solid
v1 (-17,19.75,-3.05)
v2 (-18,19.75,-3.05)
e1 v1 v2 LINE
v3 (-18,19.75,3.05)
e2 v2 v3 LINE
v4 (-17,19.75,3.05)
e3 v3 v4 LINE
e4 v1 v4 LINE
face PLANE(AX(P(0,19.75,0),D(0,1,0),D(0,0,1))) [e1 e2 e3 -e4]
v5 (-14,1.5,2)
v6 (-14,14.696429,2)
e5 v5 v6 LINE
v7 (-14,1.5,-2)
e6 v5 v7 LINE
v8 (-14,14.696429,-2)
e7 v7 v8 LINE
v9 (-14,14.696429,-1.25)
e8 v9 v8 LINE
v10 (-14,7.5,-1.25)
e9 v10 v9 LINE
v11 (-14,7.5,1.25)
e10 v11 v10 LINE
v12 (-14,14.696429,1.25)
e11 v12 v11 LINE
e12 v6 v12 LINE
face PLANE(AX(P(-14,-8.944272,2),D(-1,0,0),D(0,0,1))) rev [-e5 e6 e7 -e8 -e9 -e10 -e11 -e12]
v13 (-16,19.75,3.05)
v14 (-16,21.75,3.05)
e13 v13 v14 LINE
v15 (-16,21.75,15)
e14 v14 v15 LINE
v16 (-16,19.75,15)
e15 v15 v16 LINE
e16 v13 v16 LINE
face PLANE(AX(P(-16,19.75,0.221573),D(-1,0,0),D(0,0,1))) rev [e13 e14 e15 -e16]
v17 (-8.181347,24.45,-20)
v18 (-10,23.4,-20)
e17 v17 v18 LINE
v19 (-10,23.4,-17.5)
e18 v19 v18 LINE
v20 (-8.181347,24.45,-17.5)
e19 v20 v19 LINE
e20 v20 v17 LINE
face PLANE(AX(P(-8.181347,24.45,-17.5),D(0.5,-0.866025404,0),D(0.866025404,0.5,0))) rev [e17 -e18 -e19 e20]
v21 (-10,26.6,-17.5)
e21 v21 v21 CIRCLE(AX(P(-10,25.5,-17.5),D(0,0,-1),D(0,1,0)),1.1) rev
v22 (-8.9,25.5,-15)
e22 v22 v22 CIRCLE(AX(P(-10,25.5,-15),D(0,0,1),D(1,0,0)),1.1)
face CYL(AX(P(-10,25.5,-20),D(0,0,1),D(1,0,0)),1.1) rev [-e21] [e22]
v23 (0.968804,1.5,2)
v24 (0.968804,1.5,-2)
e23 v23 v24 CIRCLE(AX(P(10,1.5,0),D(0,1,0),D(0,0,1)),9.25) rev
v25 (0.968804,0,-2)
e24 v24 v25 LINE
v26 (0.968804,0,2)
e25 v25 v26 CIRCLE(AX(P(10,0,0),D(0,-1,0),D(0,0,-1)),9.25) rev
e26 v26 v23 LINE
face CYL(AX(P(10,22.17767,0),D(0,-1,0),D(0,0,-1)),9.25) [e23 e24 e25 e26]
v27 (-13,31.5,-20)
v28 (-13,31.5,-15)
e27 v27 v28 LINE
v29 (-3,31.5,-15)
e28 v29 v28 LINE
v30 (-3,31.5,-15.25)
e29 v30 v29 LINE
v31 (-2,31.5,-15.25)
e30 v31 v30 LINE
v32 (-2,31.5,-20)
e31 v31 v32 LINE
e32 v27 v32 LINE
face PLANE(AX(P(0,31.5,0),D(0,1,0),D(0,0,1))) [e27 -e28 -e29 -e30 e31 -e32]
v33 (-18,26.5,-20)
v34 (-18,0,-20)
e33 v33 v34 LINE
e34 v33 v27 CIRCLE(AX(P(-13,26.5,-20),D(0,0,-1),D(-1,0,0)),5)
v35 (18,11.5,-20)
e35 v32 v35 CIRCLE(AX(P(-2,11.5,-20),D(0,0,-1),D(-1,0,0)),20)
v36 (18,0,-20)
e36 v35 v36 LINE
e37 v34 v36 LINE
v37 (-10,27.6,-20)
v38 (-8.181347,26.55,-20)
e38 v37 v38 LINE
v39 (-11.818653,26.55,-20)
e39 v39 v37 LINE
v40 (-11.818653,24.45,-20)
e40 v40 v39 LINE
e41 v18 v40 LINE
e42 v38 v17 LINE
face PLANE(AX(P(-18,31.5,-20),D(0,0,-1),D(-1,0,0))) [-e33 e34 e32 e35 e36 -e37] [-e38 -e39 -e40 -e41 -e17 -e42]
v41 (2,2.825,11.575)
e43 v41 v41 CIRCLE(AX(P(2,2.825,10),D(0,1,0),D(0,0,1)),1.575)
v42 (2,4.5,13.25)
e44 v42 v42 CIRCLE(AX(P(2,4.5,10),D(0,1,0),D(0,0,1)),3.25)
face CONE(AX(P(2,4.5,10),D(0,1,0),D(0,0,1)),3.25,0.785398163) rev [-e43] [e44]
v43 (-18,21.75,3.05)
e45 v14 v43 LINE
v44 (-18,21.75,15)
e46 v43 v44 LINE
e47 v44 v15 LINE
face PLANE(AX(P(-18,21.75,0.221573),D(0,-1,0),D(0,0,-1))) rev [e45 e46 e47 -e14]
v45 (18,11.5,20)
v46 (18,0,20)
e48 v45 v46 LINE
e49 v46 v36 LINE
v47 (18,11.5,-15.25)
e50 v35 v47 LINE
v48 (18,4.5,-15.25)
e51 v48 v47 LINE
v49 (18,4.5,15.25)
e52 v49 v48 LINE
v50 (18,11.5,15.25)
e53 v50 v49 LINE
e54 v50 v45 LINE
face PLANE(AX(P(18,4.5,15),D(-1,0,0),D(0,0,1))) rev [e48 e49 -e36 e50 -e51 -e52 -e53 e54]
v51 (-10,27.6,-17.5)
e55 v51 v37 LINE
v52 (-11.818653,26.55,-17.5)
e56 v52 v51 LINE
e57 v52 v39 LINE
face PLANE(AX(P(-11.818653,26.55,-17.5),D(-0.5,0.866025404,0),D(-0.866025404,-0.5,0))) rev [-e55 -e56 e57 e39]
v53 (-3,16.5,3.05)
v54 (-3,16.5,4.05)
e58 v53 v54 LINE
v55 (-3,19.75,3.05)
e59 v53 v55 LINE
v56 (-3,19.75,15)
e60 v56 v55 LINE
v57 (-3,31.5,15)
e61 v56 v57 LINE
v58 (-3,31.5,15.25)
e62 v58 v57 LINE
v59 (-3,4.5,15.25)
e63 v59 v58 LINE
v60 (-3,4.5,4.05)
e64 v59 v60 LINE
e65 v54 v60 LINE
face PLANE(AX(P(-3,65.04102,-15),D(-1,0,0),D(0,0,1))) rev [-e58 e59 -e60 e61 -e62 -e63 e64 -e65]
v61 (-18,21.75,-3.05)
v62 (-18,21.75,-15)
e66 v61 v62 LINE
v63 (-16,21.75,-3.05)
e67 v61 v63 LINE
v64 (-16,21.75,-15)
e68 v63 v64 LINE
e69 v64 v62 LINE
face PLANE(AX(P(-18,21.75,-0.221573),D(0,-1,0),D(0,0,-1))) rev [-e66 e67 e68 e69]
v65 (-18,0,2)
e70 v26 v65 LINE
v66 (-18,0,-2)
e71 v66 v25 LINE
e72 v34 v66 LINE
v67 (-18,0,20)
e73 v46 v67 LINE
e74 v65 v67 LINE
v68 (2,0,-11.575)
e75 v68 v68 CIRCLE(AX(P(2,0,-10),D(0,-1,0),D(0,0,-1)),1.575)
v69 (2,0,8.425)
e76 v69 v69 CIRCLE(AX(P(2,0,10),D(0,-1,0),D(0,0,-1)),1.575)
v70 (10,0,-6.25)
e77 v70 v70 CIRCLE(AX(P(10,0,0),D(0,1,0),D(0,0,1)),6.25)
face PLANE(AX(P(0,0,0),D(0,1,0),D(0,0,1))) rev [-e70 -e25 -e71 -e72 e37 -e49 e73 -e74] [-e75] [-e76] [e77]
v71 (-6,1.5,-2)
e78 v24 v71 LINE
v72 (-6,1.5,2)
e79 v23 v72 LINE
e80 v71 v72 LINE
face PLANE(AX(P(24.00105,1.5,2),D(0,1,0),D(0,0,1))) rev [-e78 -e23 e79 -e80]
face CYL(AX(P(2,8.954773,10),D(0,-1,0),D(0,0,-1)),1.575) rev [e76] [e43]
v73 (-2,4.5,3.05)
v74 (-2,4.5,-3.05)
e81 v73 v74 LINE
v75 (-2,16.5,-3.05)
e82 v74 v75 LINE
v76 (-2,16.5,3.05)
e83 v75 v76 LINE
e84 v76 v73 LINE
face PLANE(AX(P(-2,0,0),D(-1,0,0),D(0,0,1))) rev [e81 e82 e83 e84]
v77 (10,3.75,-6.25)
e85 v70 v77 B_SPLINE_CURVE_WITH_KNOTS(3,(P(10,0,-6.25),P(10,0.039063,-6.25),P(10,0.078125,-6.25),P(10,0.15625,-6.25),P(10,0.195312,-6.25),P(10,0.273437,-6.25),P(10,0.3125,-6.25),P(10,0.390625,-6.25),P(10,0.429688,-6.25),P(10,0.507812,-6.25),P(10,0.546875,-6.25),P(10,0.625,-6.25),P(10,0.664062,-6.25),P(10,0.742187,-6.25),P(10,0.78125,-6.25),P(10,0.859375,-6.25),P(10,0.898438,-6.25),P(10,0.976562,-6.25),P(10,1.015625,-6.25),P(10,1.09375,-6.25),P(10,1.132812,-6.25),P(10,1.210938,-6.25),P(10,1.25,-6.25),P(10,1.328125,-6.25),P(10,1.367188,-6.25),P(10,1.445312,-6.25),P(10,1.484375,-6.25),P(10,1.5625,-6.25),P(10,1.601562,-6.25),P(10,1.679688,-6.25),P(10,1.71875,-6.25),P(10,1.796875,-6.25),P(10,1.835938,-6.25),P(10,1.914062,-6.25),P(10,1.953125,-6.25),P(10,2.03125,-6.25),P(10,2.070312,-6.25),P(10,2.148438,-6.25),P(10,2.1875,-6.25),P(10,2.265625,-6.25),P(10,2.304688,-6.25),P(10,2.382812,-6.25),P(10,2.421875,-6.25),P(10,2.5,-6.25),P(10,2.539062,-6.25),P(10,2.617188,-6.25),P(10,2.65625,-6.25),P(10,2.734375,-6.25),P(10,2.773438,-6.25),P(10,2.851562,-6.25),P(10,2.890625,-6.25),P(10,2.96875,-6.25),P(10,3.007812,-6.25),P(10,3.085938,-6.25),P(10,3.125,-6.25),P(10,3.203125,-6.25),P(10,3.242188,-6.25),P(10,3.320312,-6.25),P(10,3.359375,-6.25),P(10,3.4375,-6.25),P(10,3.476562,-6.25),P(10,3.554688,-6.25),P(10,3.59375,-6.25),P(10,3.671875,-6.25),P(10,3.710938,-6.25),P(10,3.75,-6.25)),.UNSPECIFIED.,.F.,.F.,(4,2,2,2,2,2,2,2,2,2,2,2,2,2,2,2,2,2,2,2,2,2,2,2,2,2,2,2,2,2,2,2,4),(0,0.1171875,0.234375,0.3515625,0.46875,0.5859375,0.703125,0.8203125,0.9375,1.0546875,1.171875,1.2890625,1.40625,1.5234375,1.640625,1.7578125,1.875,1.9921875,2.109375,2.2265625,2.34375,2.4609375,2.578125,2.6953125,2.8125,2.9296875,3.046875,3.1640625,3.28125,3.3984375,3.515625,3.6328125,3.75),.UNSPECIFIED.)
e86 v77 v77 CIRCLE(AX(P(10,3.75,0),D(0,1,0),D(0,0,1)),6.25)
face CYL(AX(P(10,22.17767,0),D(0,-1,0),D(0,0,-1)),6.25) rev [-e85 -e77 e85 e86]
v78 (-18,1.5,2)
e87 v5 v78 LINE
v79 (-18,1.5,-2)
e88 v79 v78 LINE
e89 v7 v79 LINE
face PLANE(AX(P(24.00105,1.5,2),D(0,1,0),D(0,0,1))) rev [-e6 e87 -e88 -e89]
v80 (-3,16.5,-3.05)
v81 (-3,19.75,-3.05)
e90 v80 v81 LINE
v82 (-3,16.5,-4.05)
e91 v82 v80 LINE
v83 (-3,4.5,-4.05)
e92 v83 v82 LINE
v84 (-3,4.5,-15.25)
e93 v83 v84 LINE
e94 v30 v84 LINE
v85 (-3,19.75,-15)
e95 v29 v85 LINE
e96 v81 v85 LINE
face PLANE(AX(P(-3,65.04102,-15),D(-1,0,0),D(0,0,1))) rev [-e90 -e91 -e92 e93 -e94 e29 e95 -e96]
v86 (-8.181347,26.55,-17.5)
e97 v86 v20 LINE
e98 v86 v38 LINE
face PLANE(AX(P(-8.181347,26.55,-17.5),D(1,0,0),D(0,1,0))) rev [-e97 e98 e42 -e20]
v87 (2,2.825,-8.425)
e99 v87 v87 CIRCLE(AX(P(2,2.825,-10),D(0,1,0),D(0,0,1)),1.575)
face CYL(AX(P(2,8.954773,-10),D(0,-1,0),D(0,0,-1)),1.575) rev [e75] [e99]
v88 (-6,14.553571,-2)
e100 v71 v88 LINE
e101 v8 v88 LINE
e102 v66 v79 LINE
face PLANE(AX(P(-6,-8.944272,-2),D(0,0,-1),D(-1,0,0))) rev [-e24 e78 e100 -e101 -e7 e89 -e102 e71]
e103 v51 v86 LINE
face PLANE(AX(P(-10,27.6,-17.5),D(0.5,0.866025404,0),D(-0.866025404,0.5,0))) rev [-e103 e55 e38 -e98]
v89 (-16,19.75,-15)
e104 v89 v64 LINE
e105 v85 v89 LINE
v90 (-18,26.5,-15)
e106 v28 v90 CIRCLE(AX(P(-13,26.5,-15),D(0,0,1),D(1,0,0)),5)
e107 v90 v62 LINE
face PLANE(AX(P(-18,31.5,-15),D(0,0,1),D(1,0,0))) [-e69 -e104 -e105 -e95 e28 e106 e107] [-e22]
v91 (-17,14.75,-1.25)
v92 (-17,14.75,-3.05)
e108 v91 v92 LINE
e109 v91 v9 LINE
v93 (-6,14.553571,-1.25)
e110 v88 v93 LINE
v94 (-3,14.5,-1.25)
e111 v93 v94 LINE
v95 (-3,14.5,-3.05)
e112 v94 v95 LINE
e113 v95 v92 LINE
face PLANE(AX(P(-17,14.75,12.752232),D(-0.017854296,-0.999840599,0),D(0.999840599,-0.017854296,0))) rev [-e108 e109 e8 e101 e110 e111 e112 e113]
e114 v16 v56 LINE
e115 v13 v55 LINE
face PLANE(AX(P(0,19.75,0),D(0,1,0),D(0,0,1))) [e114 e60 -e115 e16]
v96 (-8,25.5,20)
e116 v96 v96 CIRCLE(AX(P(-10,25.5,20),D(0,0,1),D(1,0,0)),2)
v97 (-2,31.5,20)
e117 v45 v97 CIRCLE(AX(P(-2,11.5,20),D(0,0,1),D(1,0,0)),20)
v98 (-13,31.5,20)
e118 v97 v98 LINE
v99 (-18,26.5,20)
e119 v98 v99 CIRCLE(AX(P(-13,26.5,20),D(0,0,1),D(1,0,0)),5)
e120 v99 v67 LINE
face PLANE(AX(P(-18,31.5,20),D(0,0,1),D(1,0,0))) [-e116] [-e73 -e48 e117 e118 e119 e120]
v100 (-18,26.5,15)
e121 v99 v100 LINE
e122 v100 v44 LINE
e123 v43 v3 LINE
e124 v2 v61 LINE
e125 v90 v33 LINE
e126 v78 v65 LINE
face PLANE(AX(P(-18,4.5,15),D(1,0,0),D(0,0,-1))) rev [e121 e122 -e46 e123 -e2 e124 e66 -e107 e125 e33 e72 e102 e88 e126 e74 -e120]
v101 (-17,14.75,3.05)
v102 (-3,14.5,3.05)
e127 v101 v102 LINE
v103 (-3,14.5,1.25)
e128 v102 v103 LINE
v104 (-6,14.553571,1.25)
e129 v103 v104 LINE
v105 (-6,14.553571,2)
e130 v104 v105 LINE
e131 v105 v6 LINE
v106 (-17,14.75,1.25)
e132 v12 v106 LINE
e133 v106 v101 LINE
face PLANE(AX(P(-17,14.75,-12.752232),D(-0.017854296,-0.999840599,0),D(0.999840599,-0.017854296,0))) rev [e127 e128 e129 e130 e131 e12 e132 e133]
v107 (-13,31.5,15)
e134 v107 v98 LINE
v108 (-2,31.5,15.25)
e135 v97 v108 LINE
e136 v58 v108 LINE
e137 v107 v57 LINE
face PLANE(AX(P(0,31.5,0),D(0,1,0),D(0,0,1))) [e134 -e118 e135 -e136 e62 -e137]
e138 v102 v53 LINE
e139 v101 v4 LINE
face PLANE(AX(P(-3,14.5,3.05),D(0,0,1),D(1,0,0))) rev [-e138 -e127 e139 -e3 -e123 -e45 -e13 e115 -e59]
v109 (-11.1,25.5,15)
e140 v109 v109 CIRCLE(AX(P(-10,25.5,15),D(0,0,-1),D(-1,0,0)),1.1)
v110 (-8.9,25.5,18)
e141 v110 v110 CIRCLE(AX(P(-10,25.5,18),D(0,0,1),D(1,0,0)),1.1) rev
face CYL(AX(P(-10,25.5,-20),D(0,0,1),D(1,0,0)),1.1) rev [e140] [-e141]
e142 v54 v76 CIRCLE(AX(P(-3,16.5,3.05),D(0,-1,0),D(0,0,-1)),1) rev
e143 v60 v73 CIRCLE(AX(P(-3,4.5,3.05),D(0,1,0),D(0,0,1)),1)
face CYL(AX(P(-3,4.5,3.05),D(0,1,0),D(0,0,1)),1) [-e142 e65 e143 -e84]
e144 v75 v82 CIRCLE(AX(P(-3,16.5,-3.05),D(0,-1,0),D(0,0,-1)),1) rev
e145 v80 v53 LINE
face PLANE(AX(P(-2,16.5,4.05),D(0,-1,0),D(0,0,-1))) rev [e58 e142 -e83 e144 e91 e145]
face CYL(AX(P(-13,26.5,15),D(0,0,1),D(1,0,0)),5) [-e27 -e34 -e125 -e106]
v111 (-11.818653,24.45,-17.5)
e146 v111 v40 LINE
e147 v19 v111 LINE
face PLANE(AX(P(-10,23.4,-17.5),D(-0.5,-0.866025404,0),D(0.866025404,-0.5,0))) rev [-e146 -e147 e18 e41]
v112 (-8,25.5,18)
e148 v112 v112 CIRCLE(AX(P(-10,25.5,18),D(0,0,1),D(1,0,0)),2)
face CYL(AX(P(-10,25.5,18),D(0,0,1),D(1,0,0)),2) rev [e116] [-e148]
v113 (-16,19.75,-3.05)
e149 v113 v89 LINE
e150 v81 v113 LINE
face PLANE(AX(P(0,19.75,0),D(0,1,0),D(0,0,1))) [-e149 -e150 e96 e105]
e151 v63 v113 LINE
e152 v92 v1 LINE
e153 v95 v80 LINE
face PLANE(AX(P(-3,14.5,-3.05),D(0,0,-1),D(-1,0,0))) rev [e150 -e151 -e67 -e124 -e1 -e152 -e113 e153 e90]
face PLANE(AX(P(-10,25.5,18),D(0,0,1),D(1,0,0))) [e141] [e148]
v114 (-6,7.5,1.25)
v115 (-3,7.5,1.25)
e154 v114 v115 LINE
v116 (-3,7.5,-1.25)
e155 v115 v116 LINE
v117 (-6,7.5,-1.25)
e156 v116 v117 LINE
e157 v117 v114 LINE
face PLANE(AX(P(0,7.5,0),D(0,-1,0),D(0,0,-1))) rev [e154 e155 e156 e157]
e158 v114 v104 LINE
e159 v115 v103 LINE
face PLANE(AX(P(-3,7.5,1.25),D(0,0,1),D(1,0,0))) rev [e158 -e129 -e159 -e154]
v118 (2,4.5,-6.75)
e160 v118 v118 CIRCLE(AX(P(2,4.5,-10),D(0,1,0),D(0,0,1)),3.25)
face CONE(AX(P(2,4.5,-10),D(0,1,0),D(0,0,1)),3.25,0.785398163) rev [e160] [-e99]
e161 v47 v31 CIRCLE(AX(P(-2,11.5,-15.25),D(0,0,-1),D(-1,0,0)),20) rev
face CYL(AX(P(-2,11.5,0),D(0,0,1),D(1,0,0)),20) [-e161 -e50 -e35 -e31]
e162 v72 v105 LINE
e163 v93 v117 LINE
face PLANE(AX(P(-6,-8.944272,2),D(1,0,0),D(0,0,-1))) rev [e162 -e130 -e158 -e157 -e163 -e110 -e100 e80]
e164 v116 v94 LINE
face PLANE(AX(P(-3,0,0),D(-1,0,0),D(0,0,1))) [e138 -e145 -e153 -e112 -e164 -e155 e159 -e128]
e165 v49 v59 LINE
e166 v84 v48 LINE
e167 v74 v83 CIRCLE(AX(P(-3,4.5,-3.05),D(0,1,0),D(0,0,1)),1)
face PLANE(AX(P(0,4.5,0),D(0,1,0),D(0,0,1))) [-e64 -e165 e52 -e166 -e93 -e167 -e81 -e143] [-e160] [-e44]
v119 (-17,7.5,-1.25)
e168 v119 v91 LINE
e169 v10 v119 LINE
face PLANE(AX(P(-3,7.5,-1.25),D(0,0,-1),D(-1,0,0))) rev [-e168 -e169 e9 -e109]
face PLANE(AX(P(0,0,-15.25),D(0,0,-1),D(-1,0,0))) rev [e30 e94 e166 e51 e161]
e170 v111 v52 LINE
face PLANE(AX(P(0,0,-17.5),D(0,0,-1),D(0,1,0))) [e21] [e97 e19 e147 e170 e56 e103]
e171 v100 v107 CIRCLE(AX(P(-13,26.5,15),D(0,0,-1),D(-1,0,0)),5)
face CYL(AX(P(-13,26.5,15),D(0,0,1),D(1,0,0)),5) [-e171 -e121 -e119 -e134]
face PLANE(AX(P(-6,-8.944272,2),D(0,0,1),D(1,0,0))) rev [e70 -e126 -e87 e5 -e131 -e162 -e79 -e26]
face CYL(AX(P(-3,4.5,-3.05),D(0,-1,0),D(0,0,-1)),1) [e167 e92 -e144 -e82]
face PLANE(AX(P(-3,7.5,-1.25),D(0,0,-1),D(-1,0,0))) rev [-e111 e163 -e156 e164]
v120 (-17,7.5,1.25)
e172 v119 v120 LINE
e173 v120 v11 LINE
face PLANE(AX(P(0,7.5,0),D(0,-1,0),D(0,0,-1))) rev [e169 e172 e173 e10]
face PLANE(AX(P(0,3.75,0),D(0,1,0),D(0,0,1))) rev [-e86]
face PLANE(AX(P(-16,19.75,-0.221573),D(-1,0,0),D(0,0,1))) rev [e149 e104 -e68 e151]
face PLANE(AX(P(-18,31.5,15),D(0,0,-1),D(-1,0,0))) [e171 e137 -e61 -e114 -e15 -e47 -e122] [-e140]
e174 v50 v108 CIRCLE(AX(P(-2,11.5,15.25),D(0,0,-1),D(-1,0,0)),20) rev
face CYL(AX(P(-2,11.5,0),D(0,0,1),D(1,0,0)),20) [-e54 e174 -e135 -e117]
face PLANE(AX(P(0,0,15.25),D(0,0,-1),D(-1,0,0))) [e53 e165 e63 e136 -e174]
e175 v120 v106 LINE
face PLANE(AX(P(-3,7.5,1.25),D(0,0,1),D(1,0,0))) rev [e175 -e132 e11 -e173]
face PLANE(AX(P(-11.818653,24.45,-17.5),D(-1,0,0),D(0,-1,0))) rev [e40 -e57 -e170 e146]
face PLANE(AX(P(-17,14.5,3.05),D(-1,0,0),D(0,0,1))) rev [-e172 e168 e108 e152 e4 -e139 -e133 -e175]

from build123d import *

# Parameters (mm, degrees)
BASE_W                              = 36
BASE_H                              = 30
BOSS_EXTRUDE1_DEPTH                 = 4.5
WALLS_W                             = 36
WALLS_H                             = 5
WALLS_EXT_DEPTH                     = 31.5
SWITCH_BLOCK_W                      = 15
SWITCH_BLOCK_H                      = 30
SWITCH_BLOCK_EXT_DEPTH              = 15.25
MAGNET_POCKET_R                     = 6.25
MAGNET_POCKET_CUT_DEPTH             = 3.75
FILLET1_R                           = 5
FILLET2_R                           = 5
FILLET3_R                           = 20
FILLET4_R                           = 20
SWITCH_PLACE_W                      = 14
SWITCH_PLACE_H                      = 6.1
SWITCH_POCKET_DEPTH                 = 5.25
SWITCH_CONTACTS_W                   = 14
SWITCH_CONTACTS_H                   = 2.5
SWITCH_LEADS_DEPTH                  = 7
SWITCH_ANGLE_LEFT_DEPTH             = 1.8
SWITCH_ANGLE_RIGHT_DEPTH            = 1.8
SKETCH20_W                          = 8.1
SKETCH20_H                          = 12
BOSS_EXTRUDE5_DEPTH                 = 1
FILLET5_R                           = 1
FILLET6_R                           = 1
WIRE_GUIDE_W                        = 8
WIRE_GUIDE_H                        = 4
WIRE_PASS_THROUGH_DEPTH             = 7.5
WIRE_PASS_THROUGH_DIRECTION_2_REACH = 38.056
WIRE_CHANNEL_OUTLINE_W              = 4
WIRE_CHANNEL_OUTLINE_H              = 4
WIRE_CHANNEL_DEPTH                  = 1.5
ACHSE_R                             = 1.1
M2_ACHSE_DEPTH                      = 55.002314765
M2_NUT_DEPTH                        = 2.5
SKETCH2_R                           = 1.575
M3_MOUNTING_SCREWS_DEPTH            = 4.5
SKETCH9_W                           = 2
SKETCH9_H                           = 2
BOSS_EXTRUDE3_DEPTH                 = 11.95
SKETCH10_W                          = 2
SKETCH10_H                          = 2
BOSS_EXTRUDE4_DEPTH                 = 11.95
SKETCH19_R                          = 2
SCREW_HEAD_DEPTH                    = 2
SKETCH21_W                          = 21
SKETCH21_H                          = 27
CUT_EXTRUDE2_DEPTH                  = 0.25
SKETCH22_W                          = 21
SKETCH22_H                          = 27
CUT_EXTRUDE3_DEPTH                  = 0.25


# Read off the part's stored shape, not the designer's step: Wire Channel
with BuildPart() as part:
    # Base → Boss-Extrude1 (new body)
    with BuildSketch(Plane(origin=(0, 0, 0), x_dir=(1, 0, 0), z_dir=(0, 1, 0))):
        Rectangle(BASE_W, BASE_H)
    extrude(amount=BOSS_EXTRUDE1_DEPTH)

    # Walls → Walls Ext (add)
    with BuildSketch(Plane.XZ):
        with Locations((0, 17.5)):
            Rectangle(WALLS_W, WALLS_H)
        with Locations((0, -17.5)):
            Rectangle(WALLS_W, WALLS_H)
    extrude(amount=-WALLS_EXT_DEPTH)

    # Switch Block → Switch Block Ext (add)
    with BuildSketch(Plane(origin=(0, 4.5, 0), x_dir=(1, 0, 0), z_dir=(0, 1, 0))):
        with Locations((-10.5, 0)):
            Rectangle(SWITCH_BLOCK_W, SWITCH_BLOCK_H)
    extrude(amount=SWITCH_BLOCK_EXT_DEPTH)

    # Magnet Pocket → Magnet Pocket Cut (cut)
    with BuildSketch(Plane(origin=(0, 0, 0), x_dir=(1, 0, 0), z_dir=(0, 1, 0))):
        with Locations(Location((10, 0, 0), (0, 0, 90))):
            Circle(MAGNET_POCKET_R)
    extrude(amount=MAGNET_POCKET_CUT_DEPTH, mode=Mode.SUBTRACT)

    # Fillet1
    fillet1_edges = [part.edges().sort_by_distance(p)[0] for p in [
        (-18, 31.5, -17.5),
    ]]
    fillet(fillet1_edges, radius=FILLET1_R)

    # Fillet2
    fillet2_edges = [part.edges().sort_by_distance(p)[0] for p in [
        (-18, 31.5, 17.5),
    ]]
    fillet(fillet2_edges, radius=FILLET2_R)

    # Fillet3
    fillet3_edges = [part.edges().sort_by_distance(p)[0] for p in [
        (18, 31.5, -17.5),
    ]]
    fillet(fillet3_edges, radius=FILLET3_R)

    # Fillet4
    fillet4_edges = [part.edges().sort_by_distance(p)[0] for p in [
        (18, 31.5, 17.5),
    ]]
    fillet(fillet4_edges, radius=FILLET4_R)

    # Switch Place → Switch Pocket (cut)
    with BuildSketch(Plane(origin=(0, 19.75, 0), x_dir=(1, 0, 0), z_dir=(0, 1, 0))):
        with Locations((-10, 0)):
            Rectangle(SWITCH_PLACE_W, SWITCH_PLACE_H)
    extrude(amount=-SWITCH_POCKET_DEPTH, mode=Mode.SUBTRACT)

    # Switch Contacts → Switch Leads (cut)
    with BuildSketch(Plane(origin=(0, 14.5, 0), x_dir=(1, 0, 0), z_dir=(0, 1, 0))):
        with Locations((-10, 0)):
            Rectangle(SWITCH_CONTACTS_W, SWITCH_CONTACTS_H)
    extrude(amount=-SWITCH_LEADS_DEPTH, mode=Mode.SUBTRACT)

    # Sketch16 → Switch Angle Left (add)
    with BuildSketch(Plane(origin=(0, 0, 3.05), x_dir=(-1, 0, 0), z_dir=(0, 0, -1))):
        Polygon((17, 14.5), (17, 14.75), (3, 14.5), align=None)
    extrude(amount=SWITCH_ANGLE_LEFT_DEPTH)

    # Sketch17 → Switch Angle Right (add)
    with BuildSketch(Plane.XY.offset(-3.05)):
        Polygon((-17, 14.5), (-17, 14.75), (-3, 14.5), align=None)
    extrude(amount=SWITCH_ANGLE_RIGHT_DEPTH)

    # Sketch20 → Boss-Extrude5 (add)
    with BuildSketch(Plane(origin=(-3, 0, 0), x_dir=(0, 0, -1), z_dir=(1, 0, 0))):
        with Locations((0, 10.5)):
            Rectangle(SKETCH20_W, SKETCH20_H)
    extrude(amount=BOSS_EXTRUDE5_DEPTH)

    # Fillet5
    fillet5_edges = [part.edges().sort_by_distance(p)[0] for p in [
        (-2, 10.5, 4.05),
    ]]
    fillet(fillet5_edges, radius=FILLET5_R - 0.0001)  # a hair under: the kernel refuses the full size

    # Fillet6
    fillet6_edges = [part.edges().sort_by_distance(p)[0] for p in [
        (-2, 10.5, -4.05),
    ]]
    fillet(fillet6_edges, radius=FILLET6_R - 0.0001)  # a hair under: the kernel refuses the full size

    # Wire Guide → Wire pass through (cut)
    with BuildSketch(Plane(origin=(0, 7.5, 0), x_dir=(1, 0, 0), z_dir=(0, 1, 0))):
        with Locations((-10, 0)):
            Rectangle(WIRE_GUIDE_W, WIRE_GUIDE_H)
    extrude(amount=-WIRE_PASS_THROUGH_DEPTH, mode=Mode.SUBTRACT)

    # Wire pass through direction 2: up to this plane
    wire_pass_through_direction_2_end = Plane(origin=(-17, 14.75, -12.752231965), z_dir=(-0.017854296416882947, -0.9998405993454447, 0))
    # Wire Guide → Wire pass through direction 2 (cut, up to the surface)
    with BuildSketch(Plane(origin=(0, 7.5, 0), x_dir=(1, 0, 0), z_dir=(0, 1, 0)), mode=Mode.PRIVATE) as wire_pass_through_direction_2_sk1:
        with Locations((-10, 0)):
            Rectangle(WIRE_GUIDE_W, WIRE_GUIDE_H)
    wire_pass_through_direction_2_tool1 = split(extrude(wire_pass_through_direction_2_sk1.sketch, amount=WIRE_PASS_THROUGH_DIRECTION_2_REACH, mode=Mode.PRIVATE), bisect_by=wire_pass_through_direction_2_end, keep=Keep.BOTH, mode=Mode.PRIVATE)
    add(wire_pass_through_direction_2_tool1.solids().sort_by_distance((-10, 7.5, 0))[0], mode=Mode.SUBTRACT)

    # Wire Channel outline → Wire Channel (cut)
    with BuildSketch(Plane(origin=(0, 0, 0), x_dir=(1, 0, 0), z_dir=(0, 1, 0))):
        with Locations((-16, 0)):
            Rectangle(WIRE_CHANNEL_OUTLINE_W, WIRE_CHANNEL_OUTLINE_H)
        with BuildLine():
            Line((-6, 2), (-6, -2))
            Line((-6, -2), (0.968804066, -2))
            ThreePointArc((0.968804066, -2), (0.75, 0), (0.968804066, 2))
            Line((0.968804066, 2), (-6, 2))
        make_face()
    extrude(amount=WIRE_CHANNEL_DEPTH, mode=Mode.SUBTRACT)

    # Achse → M2 Achse (cut, through all)
    with BuildSketch(Plane.XY.offset(20)):
        with Locations((-10, 25.5)):
            Circle(ACHSE_R)
    extrude(amount=-M2_ACHSE_DEPTH, mode=Mode.SUBTRACT)

    # Sketch5 → M2 Nut (cut)
    with BuildSketch(Plane(origin=(0, 0, -20), x_dir=(-1, 0, 0), z_dir=(0, 0, -1))):
        Polygon((10, 27.6), (8.181346652, 26.55), (8.181346652, 24.45), (10, 23.4), (11.818653348, 24.45), (11.818653348, 26.55), align=None)
    extrude(amount=-M2_NUT_DEPTH, mode=Mode.SUBTRACT)

    # Sketch2 → M3 Mounting Screws (cut)
    with BuildSketch(Plane.XZ):
        with Locations(Location((2, -10, 0), (0, 0, 270))):
            Circle(SKETCH2_R)
        with Locations(Location((2, 10, 0), (0, 0, 270))):
            Circle(SKETCH2_R)
    extrude(amount=-M3_MOUNTING_SCREWS_DEPTH, mode=Mode.SUBTRACT)

    # M3 Senkkopf cone 1 section (through the dimple's axis) → M3 Senkkopf (revolve, cut)
    with BuildSketch(Plane(origin=(2, 4.5, 10), x_dir=(0, 0, 1), z_dir=(1, 0, 0))):
        Polygon((0, 0), (3.25, 0), (0, 3.25), align=None)
    revolve(axis=Axis((2, 4.5, 10), (0, -1, 0)), mode=Mode.SUBTRACT)

    # M3 Senkkopf cone 2 section (through the dimple's axis) → M3 Senkkopf cone 2 (revolve, cut)
    with BuildSketch(Plane(origin=(2, 4.5, -10), x_dir=(0, 0, 1), z_dir=(1, 0, 0))):
        Polygon((0, 0), (3.25, 0), (0, 3.25), align=None)
    revolve(axis=Axis((2, 4.5, -10), (0, -1, 0)), mode=Mode.SUBTRACT)

    # Sketch9 → Boss-Extrude3 (add)
    with BuildSketch(Plane.XY.offset(-15)):
        with Locations((-17, 20.75)):
            Rectangle(SKETCH9_W, SKETCH9_H)
    extrude(amount=BOSS_EXTRUDE3_DEPTH)

    # Sketch10 → Boss-Extrude4 (add)
    with BuildSketch(Plane(origin=(0, 0, 15), x_dir=(-1, 0, 0), z_dir=(0, 0, -1))):
        with Locations((17, 20.75)):
            Rectangle(SKETCH10_W, SKETCH10_H)
    extrude(amount=BOSS_EXTRUDE4_DEPTH)

    # Sketch19 → Screw Head (cut)
    with BuildSketch(Plane.XY.offset(20)):
        with Locations((-10, 25.5)):
            Circle(SKETCH19_R)
    extrude(amount=-SCREW_HEAD_DEPTH, mode=Mode.SUBTRACT)

    # Sketch21 → Cut-Extrude2 (cut)
    with BuildSketch(Plane(origin=(0, 0, 15), x_dir=(-1, 0, 0), z_dir=(0, 0, -1))):
        with Locations((-7.5, 18)):
            Rectangle(SKETCH21_W, SKETCH21_H)
    extrude(amount=-CUT_EXTRUDE2_DEPTH, mode=Mode.SUBTRACT)

    # Sketch22 → Cut-Extrude3 (cut)
    with BuildSketch(Plane.XY.offset(-15)):
        with Locations((7.5, 18)):
            Rectangle(SKETCH22_W, SKETCH22_H)
    extrude(amount=-CUT_EXTRUDE3_DEPTH, mode=Mode.SUBTRACT)


solid = part.part
